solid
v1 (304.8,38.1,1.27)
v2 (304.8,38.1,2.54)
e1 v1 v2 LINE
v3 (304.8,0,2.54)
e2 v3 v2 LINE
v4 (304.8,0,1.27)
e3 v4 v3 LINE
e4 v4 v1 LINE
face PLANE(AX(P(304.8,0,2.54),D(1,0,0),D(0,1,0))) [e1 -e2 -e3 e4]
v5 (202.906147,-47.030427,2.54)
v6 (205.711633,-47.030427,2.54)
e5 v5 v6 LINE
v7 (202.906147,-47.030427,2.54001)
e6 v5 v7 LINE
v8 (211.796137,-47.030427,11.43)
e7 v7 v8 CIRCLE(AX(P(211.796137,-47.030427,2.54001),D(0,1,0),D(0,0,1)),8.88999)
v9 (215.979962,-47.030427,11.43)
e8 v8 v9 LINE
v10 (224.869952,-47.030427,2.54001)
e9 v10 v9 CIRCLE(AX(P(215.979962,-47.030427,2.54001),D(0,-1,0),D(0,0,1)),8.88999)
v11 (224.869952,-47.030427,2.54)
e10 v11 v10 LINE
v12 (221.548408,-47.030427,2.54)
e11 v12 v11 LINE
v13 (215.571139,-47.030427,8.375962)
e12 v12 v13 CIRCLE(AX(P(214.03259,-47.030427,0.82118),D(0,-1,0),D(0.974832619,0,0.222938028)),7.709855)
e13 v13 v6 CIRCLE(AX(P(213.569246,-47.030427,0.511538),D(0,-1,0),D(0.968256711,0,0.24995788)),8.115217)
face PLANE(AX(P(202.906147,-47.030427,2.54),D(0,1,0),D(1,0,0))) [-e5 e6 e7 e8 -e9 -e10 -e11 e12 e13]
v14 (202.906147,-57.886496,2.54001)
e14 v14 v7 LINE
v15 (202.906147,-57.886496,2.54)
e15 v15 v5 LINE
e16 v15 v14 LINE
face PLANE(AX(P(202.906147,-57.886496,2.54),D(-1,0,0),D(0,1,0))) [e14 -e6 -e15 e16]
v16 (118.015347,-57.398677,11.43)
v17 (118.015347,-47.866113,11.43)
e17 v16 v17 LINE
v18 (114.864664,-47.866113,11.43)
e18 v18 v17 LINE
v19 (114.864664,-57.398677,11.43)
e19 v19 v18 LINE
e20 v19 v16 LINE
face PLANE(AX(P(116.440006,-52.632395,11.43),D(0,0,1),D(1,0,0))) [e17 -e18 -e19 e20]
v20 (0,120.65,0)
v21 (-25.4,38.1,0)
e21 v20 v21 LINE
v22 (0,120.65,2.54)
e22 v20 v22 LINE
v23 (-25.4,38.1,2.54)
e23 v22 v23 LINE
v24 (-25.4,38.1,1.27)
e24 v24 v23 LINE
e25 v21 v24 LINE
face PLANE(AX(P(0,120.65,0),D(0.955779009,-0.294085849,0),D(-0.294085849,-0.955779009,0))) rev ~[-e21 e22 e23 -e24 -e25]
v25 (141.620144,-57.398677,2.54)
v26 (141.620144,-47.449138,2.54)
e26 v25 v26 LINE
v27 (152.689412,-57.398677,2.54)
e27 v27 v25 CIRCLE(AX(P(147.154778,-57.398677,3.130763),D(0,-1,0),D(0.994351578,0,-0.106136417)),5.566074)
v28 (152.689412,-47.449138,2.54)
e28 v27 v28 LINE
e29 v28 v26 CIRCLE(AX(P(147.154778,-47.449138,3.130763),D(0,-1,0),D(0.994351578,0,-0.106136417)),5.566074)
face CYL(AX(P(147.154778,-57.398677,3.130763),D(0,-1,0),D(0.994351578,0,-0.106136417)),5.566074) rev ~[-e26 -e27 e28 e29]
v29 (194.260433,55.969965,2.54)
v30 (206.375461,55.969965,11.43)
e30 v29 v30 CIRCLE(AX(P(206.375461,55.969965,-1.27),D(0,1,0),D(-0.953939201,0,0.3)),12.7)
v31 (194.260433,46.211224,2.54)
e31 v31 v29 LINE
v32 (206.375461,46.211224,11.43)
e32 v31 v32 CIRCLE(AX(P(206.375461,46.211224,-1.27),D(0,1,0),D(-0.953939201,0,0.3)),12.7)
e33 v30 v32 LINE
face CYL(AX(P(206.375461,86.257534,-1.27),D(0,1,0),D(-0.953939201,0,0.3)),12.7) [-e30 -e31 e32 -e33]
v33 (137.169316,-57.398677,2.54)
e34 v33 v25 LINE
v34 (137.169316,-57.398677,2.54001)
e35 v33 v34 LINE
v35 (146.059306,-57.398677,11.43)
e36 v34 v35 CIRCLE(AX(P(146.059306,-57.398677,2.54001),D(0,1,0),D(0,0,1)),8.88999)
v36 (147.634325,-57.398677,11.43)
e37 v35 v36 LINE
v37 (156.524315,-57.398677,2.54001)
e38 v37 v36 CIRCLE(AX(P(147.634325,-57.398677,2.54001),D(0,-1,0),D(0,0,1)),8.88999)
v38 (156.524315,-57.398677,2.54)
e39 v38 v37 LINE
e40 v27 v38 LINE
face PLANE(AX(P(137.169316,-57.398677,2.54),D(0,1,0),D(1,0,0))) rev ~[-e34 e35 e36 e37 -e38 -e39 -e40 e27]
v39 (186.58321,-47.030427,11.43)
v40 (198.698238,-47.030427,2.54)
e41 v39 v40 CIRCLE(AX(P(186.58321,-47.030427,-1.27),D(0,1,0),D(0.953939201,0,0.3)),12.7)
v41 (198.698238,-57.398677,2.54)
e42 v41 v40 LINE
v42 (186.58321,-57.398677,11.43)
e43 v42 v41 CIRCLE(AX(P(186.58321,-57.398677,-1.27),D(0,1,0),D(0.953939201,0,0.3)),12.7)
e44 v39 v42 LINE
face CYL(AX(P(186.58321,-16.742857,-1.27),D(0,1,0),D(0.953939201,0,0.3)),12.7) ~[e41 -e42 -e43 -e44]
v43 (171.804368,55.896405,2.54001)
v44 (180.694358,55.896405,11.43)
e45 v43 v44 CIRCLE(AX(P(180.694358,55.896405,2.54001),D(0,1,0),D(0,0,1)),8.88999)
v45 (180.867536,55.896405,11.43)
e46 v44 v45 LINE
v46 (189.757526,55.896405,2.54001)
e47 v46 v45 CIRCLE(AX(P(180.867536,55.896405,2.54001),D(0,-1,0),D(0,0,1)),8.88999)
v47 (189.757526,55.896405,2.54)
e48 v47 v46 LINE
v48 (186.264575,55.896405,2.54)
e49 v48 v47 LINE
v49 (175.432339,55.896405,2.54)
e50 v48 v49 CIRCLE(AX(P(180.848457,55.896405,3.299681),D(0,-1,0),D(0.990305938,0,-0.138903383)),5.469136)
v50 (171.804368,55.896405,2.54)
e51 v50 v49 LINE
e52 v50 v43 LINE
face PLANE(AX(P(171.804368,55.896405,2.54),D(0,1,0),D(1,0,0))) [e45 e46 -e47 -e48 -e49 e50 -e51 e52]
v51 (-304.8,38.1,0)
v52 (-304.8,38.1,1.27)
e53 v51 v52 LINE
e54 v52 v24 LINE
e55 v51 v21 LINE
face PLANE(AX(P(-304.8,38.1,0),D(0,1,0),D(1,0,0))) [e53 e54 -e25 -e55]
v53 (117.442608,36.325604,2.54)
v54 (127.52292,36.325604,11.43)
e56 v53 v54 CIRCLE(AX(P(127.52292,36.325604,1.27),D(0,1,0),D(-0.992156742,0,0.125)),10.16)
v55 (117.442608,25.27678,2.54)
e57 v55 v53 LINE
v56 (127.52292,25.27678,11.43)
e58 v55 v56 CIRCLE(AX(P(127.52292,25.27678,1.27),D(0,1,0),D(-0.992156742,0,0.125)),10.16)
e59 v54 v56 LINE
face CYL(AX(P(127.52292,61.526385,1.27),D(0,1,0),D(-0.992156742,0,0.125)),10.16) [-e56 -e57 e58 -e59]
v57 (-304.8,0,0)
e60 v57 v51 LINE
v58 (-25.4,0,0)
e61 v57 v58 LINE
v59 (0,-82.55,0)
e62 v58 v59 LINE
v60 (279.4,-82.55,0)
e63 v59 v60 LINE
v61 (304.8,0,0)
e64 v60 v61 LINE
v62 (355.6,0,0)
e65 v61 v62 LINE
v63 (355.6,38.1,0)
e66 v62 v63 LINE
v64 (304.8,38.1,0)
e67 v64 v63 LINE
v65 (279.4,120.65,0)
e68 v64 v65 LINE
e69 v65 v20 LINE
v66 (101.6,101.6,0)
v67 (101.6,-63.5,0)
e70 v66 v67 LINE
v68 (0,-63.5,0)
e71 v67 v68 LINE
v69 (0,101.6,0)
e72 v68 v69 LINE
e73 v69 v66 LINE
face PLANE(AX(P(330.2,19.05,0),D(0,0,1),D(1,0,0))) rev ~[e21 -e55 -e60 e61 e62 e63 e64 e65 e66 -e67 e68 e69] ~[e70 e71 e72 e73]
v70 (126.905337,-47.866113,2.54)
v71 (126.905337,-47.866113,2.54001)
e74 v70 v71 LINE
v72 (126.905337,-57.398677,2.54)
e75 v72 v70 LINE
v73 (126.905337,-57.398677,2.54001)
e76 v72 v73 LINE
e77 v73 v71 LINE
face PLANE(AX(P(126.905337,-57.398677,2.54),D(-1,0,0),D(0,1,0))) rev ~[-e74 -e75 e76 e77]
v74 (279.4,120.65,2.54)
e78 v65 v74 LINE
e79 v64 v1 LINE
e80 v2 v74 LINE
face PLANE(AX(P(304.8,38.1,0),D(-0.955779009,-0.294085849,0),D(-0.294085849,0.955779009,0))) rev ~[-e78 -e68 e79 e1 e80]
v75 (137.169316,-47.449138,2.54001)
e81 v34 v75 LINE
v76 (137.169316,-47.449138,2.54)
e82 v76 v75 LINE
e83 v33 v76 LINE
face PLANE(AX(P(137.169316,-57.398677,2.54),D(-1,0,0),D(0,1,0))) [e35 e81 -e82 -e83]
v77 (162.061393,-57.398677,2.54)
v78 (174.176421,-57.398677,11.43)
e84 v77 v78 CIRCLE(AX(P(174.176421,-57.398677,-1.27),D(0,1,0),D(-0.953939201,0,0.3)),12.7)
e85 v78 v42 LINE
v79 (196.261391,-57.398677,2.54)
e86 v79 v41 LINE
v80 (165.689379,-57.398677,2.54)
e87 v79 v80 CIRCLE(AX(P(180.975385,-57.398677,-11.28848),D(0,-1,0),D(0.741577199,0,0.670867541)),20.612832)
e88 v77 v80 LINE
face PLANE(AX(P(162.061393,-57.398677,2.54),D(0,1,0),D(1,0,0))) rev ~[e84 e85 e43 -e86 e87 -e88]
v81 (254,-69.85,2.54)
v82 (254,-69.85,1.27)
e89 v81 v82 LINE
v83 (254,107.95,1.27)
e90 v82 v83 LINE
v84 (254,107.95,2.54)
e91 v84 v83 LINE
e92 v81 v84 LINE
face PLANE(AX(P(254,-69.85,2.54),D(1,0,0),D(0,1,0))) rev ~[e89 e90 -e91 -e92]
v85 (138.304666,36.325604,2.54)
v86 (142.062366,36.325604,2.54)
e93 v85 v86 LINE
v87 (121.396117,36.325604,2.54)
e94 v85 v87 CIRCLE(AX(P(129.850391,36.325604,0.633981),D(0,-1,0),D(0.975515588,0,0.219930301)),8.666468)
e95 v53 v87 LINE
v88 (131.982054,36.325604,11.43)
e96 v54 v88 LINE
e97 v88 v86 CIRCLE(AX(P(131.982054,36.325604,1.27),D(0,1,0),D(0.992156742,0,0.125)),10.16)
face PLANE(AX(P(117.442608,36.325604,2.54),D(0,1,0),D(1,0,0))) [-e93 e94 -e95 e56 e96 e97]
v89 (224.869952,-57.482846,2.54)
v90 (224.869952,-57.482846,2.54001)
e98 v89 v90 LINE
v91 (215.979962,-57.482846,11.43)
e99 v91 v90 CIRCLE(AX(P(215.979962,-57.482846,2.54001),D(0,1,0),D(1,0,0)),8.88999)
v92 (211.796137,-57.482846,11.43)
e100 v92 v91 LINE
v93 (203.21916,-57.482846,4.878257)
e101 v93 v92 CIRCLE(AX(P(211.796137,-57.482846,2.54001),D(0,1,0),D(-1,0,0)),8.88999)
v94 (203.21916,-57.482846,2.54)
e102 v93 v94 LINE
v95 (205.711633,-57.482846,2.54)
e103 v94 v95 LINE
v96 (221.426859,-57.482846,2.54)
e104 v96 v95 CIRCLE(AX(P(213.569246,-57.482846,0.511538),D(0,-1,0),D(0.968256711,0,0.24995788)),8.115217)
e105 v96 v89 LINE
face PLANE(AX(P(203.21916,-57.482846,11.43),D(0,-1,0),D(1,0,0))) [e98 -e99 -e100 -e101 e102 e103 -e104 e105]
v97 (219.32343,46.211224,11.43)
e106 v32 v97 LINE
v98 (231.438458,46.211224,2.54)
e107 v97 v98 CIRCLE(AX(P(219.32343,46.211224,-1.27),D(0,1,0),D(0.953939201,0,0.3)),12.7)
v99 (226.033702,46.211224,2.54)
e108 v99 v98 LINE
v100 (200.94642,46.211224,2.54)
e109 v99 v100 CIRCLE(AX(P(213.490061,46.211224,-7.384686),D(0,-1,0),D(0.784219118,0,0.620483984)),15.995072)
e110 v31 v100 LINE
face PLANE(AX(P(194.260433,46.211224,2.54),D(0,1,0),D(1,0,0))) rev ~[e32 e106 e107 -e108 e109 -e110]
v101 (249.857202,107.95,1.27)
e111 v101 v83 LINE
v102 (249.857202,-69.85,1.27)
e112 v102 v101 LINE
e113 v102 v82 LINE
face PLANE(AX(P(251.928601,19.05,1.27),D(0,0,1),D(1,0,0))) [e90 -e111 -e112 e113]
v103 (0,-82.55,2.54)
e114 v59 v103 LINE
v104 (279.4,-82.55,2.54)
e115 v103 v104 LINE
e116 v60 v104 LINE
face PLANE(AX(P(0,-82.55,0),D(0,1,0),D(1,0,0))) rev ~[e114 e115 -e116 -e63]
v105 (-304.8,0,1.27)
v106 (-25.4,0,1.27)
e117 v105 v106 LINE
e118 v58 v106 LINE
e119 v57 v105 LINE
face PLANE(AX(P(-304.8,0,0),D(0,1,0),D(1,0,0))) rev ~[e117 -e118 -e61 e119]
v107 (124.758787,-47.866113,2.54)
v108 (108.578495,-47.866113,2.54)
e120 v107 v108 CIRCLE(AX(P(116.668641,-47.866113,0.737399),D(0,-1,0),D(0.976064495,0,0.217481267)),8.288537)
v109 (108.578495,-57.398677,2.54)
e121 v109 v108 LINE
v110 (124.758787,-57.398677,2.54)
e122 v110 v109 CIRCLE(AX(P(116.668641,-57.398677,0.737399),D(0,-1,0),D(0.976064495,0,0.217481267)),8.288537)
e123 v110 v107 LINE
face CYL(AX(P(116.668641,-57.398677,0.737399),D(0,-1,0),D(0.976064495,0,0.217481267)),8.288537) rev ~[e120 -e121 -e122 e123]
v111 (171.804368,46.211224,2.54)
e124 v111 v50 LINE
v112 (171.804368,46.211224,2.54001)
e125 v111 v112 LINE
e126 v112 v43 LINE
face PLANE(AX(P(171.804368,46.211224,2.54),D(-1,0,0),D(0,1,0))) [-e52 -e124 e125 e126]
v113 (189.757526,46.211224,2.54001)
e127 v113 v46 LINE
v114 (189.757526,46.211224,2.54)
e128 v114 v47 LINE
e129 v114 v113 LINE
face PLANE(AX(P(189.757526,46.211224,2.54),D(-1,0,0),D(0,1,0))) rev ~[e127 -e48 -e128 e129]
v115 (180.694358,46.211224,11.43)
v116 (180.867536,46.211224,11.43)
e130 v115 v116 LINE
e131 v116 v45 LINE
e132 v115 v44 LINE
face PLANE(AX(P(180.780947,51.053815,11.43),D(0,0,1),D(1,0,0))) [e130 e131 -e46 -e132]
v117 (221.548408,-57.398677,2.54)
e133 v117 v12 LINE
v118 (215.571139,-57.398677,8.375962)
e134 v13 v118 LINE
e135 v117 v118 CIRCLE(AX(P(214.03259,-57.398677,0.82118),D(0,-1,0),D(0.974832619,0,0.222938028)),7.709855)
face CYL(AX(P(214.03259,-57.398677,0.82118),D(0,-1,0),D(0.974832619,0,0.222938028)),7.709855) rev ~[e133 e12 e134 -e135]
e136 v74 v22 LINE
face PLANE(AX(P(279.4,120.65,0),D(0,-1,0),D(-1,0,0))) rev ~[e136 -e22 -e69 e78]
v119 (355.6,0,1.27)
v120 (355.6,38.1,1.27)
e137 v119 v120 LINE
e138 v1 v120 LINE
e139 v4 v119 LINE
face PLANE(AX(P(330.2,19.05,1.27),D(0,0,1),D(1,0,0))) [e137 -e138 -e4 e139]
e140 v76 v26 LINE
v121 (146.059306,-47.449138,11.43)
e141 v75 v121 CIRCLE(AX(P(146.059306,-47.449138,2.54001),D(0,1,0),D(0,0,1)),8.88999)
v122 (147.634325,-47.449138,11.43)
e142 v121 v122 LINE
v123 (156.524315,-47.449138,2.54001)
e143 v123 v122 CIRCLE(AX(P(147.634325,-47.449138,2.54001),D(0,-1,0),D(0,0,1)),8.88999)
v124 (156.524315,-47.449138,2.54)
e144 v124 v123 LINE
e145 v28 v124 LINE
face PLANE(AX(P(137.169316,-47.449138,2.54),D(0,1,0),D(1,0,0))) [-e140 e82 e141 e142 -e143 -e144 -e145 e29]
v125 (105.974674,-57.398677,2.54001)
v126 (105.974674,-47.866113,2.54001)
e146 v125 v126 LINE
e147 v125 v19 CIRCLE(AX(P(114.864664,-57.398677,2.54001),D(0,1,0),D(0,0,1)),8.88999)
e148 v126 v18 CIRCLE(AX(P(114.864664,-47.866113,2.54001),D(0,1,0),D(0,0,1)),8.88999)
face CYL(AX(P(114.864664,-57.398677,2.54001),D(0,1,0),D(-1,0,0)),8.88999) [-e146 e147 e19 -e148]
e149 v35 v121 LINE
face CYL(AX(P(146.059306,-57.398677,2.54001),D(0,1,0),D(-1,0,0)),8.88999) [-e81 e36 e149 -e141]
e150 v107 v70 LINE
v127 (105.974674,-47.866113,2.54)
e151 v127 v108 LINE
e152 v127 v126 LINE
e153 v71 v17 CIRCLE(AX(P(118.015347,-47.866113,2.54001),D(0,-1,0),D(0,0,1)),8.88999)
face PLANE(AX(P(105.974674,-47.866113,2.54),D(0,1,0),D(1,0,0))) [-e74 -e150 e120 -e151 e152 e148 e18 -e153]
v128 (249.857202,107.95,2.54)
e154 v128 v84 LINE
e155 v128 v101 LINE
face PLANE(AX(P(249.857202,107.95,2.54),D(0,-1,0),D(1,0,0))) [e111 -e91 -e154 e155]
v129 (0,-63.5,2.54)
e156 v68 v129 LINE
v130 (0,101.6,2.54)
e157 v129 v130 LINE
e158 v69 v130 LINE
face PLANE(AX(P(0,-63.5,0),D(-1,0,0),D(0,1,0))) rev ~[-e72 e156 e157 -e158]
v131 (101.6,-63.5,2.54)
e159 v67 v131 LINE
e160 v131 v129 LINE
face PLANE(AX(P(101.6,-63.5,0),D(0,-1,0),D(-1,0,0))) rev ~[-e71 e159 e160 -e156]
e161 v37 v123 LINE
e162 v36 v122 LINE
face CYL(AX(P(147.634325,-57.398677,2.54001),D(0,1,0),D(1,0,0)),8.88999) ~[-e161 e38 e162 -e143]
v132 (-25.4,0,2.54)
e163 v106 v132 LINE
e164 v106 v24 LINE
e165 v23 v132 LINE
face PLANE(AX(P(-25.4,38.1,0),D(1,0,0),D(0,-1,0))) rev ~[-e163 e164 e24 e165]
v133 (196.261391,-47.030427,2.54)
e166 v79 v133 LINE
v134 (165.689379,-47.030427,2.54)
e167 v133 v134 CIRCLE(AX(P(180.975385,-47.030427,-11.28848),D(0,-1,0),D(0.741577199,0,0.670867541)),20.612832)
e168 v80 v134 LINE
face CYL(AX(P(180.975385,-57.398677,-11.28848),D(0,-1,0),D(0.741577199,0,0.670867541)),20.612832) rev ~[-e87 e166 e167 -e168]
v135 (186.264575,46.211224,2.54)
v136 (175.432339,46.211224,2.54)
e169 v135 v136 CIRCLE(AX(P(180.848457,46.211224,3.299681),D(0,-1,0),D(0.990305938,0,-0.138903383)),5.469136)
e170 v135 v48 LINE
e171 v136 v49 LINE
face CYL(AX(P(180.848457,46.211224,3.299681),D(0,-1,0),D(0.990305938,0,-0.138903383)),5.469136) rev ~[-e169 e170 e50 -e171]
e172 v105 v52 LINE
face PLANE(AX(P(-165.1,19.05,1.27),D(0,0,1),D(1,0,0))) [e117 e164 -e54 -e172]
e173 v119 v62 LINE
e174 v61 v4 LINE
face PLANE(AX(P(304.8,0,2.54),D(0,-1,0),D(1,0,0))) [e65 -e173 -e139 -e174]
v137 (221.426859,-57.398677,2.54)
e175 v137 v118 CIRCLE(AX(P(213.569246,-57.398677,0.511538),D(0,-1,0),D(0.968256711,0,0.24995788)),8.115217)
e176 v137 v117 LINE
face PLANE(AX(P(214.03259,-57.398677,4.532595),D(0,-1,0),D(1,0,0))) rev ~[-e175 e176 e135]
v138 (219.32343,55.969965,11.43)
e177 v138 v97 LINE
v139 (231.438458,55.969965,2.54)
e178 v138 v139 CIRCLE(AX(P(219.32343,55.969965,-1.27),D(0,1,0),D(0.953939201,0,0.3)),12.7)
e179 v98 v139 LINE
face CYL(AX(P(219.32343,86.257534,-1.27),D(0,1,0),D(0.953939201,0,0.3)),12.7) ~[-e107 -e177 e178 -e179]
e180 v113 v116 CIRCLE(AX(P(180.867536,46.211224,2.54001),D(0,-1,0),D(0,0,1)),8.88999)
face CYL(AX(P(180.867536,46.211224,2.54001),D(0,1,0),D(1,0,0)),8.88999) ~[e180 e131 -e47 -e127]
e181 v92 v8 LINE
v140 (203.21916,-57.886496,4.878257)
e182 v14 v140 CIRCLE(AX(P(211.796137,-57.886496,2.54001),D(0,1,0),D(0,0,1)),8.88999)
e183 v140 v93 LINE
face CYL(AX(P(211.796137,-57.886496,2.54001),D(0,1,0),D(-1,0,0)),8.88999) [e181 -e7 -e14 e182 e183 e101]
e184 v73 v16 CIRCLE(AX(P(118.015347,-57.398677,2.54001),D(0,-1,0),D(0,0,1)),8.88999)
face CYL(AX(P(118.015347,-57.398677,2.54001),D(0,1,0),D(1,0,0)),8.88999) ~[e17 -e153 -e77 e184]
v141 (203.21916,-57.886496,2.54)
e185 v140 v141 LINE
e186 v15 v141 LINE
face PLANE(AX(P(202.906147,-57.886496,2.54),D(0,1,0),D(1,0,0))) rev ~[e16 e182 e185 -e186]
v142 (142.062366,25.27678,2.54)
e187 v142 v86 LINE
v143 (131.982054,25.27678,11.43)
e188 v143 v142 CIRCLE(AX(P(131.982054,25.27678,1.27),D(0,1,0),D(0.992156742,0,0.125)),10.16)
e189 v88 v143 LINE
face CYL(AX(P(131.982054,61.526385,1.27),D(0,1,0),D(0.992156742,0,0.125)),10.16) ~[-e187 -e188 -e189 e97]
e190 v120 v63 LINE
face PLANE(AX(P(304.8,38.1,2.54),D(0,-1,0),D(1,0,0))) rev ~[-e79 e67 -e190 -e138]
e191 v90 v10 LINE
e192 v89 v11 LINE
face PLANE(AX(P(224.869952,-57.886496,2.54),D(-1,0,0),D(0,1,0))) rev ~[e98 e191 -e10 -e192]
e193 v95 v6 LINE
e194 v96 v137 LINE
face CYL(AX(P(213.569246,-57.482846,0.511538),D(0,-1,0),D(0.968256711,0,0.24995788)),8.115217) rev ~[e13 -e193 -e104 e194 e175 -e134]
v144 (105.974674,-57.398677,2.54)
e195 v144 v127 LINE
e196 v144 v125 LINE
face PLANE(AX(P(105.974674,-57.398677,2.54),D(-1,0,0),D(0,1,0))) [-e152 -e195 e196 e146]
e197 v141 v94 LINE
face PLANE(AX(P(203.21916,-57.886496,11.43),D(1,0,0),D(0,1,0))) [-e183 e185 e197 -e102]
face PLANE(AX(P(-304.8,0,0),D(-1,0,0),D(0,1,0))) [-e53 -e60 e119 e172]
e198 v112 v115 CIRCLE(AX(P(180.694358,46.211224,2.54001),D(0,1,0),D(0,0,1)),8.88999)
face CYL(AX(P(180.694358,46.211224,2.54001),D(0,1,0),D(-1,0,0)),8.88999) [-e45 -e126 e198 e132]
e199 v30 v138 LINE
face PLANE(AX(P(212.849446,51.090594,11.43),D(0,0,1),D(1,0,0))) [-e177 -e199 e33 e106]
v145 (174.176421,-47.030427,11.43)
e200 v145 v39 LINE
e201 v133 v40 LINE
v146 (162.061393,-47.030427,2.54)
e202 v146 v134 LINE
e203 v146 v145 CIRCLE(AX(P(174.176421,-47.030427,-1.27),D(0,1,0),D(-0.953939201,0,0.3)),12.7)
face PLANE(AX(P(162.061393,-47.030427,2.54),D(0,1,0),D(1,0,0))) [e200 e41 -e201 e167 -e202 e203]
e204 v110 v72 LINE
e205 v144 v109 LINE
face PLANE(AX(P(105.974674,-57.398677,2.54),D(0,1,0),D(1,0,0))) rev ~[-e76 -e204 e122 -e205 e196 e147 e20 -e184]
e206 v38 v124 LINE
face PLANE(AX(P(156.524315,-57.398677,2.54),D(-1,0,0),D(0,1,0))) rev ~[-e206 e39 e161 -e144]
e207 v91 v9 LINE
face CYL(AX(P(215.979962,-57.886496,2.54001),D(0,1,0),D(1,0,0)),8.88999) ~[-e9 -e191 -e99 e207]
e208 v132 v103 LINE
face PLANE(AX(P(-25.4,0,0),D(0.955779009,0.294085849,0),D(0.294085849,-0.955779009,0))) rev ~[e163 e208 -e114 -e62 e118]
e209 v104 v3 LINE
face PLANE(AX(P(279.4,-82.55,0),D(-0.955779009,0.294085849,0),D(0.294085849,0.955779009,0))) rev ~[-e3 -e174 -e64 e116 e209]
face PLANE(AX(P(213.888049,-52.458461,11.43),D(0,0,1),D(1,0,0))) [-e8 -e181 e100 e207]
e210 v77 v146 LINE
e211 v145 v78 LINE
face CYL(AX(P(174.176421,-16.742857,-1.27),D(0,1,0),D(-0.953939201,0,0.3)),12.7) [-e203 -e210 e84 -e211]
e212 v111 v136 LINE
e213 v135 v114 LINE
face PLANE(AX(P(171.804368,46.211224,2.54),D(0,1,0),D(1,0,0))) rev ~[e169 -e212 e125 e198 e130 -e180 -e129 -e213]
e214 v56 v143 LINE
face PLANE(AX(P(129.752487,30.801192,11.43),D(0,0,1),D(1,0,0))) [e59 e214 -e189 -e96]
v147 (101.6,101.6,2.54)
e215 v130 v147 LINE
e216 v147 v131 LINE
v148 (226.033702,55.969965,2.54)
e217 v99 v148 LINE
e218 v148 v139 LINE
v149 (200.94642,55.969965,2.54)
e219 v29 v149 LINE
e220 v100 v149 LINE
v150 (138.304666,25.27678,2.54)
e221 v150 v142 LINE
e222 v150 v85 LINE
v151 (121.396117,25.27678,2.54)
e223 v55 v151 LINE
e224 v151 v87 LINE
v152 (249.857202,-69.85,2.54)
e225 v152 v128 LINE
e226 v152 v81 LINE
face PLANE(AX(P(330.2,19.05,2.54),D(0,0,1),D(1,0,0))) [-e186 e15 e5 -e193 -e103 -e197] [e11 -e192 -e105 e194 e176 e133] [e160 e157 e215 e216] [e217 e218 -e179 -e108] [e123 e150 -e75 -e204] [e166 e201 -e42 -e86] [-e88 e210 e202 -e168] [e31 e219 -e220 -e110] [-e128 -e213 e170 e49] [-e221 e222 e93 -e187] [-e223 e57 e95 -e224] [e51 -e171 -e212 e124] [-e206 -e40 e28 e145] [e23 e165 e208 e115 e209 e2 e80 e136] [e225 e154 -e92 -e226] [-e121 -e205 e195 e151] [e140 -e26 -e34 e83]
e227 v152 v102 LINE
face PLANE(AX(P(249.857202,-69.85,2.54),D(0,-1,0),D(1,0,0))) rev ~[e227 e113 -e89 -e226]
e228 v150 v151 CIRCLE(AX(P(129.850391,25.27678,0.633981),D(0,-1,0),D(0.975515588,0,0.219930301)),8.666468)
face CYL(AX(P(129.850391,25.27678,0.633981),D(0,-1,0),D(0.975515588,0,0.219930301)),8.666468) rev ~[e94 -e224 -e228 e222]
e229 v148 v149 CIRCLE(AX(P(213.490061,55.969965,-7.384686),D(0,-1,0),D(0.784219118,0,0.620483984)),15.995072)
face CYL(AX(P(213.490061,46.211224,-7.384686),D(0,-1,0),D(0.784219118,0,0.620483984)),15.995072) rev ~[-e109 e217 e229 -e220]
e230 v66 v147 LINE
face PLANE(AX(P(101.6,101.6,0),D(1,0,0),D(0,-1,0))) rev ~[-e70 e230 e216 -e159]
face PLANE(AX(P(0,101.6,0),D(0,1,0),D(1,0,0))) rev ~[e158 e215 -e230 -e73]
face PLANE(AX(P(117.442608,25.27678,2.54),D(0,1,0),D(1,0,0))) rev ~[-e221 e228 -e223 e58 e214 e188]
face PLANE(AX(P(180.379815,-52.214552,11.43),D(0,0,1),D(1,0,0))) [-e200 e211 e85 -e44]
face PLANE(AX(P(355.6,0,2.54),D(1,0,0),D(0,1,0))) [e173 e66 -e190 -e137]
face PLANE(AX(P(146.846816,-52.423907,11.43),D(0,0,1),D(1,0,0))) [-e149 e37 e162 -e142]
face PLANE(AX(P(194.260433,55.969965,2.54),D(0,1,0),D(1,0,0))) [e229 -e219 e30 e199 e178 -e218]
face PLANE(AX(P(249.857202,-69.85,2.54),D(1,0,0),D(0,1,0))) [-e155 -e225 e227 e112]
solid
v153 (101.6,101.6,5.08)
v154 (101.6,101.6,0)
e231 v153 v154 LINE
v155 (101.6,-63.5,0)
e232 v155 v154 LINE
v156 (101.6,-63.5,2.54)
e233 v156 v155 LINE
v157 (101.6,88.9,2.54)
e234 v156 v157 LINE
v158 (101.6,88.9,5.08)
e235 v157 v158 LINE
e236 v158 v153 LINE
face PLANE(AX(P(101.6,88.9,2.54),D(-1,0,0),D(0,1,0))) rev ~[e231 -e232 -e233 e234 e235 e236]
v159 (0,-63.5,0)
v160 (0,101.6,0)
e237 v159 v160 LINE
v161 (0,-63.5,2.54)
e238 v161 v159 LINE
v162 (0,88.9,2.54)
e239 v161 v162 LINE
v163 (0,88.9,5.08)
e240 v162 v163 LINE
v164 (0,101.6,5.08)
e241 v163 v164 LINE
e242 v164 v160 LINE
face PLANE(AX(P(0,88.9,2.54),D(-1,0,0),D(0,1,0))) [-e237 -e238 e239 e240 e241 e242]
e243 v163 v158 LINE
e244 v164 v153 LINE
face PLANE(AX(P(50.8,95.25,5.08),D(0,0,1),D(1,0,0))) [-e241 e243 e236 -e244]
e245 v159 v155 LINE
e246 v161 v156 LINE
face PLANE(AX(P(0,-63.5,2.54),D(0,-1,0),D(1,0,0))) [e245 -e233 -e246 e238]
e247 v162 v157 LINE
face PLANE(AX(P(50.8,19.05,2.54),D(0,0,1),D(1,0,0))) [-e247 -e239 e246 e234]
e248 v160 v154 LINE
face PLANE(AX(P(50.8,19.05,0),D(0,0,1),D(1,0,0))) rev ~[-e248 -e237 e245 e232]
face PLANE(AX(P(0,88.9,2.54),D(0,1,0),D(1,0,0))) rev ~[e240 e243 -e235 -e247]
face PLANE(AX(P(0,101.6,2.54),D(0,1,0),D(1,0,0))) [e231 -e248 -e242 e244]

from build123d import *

# Parameters (mm, degrees)
F0_W         = 279.4
F0_H         = 38.1
F1_DEPTH     = 1.27
F3_DEPTH     = 2.54
F4_W         = 101.6
F4_H         = 165.1
F5_DEPTH     = 2.54
F6_W         = 101.6
F6_H         = 12.7
F7_DEPTH     = 2.54
F8_W         = 50.8
F8_H         = 38.1
F9_DEPTH     = 2.54
F10_W        = 50.8
F10_H        = 38.1
F11_DEPTH    = 1.27
F12_W        = 4.1427978277
F12_H        = 177.8
F13_DEPTH    = 1.27
F15_W        = 20.9306627512
F15_H        = 9.5325633883
F15_W_2      = 19.3549990654
F15_H_2      = 9.9495388567
F15_W_3      = 24.6197581291
F15_H_3      = 11.048823595
F15_W_4      = 36.6368442774
F15_H_4      = 10.3682503104
F15_W_5      = 17.9531574249
F15_H_5      = 9.6851810813
F15_W_6      = 37.1780246496
F15_H_6      = 9.7587406635
F15_W_7      = 21.9638049603
F15_H_7      = 10.8560696244
F16_DEPTH    = 8.89
F17_R        = 8.88999
F18_T1_DEPTH = 61.4503860708
F19_T1_DEPTH = 70.9433896004
F19_T3_DEPTH = 70.3338799535
F21_DEPTH    = 25.4
F23_DEPTH    = 25.4
F25_DEPTH    = 25.4
F26_W        = 21.9202637672
F26_H        = 0.403650105
F27_DEPTH    = 8.89
F29_DEPTH    = 25.4


# Not quite as in the source:
# - a fillet or chamfer that OpenCascade refuses, or shapes differently, is made with other operations: its cross-section is extruded or revolved along the edge and cut away or added
# - a fillet or chamfer is up to 0.001 mm smaller than in the source, because OpenCascade refuses the exact size


with BuildPart() as f1:
    # F0 (on Top) → F1 (new body)
    with BuildSketch(Plane.XY):
        with Locations((-165.1, 19.05)):
            Rectangle(F0_W, F0_H)
    extrude(amount=F1_DEPTH)

    # F2 (on Top) → F3 (join)
    with BuildSketch(Plane.XY):
        Polygon((0, -63.5), (0, 0), (0, 38.1), (0, 101.6), (0, 120.65), (-25.4, 38.1), (-25.4, 0), (0, -82.55), align=None)
        Polygon((101.6, -63.5), (0, -63.5), (0, -82.55), (279.4, -82.55), (279.4, 120.65), (0, 120.65), (0, 101.6), (101.6, 101.6), align=None)
        Polygon((279.4, 120.65), (279.4, -82.55), (304.8, 0), (304.8, 38.1), align=None)
    extrude(amount=F3_DEPTH)

    # F8 (on face) → F9 (join)
    with BuildSketch(Plane.XY.offset(2.54)):
        with Locations((330.2, 19.05)):
            Rectangle(F8_W, F8_H)
    extrude(amount=-F9_DEPTH)

    # F10 (on face) → F11 (cut)
    with BuildSketch(Plane.XY.offset(2.54)):
        with Locations((330.2, 19.05)):
            Rectangle(F10_W, F10_H)
    extrude(amount=-F11_DEPTH, mode=Mode.SUBTRACT)

    # F12 (on face) → F13 (cut)
    with BuildSketch(Plane.XY.offset(2.54)):
        with Locations((251.9286010861, 19.05)):
            Rectangle(F12_W, F12_H)
    extrude(amount=-F13_DEPTH, mode=Mode.SUBTRACT)

    # F15 (on face) → F16 (join)
    with BuildSketch(Plane.XY.offset(2.54)):
        with Locations((116.4400056005, -52.6323951781)):
            Rectangle(F15_W, F15_H)
        with Locations((146.8468159437, -52.4239074439)):
            Rectangle(F15_W_2, F15_H_2)
        with Locations((129.7524869442, 30.801191926)):
            Rectangle(F15_W_3, F15_H_3)
        with Locations((180.3798153996, -52.214551717)):
            Rectangle(F15_W_4, F15_H_4)
        with Locations((180.7809472084, 51.05381459)):
            Rectangle(F15_W_5, F15_H_5)
        with Locations((212.849445641, 51.0905943811)):
            Rectangle(F15_W_6, F15_H_6)
        with Locations((213.8880491257, -52.458461374)):
            Rectangle(F15_W_7, F15_H_7)
    extrude(amount=F16_DEPTH)

    # F17 (radius 8.89 in the source; OpenCascade refuses exactly that, so slightly less here)
    f17_edges = [f1.edges().sort_by_distance(p)[0] for p in [
        (105.974674, -52.632395, 11.43),
        (126.905337, -52.632395, 11.43),
        (137.169316, -52.423907, 11.43),
        (156.524315, -52.423907, 11.43),
        (202.906147, -52.458461, 11.43),
        (224.869952, -52.458461, 11.43),
        (189.757526, 51.053815, 11.43),
        (171.804368, 51.053815, 11.43),
    ]]
    fillet(f17_edges, radius=F17_R)

    # F18: fillet of radius 10.16 on 2 edges, made by hand

    # F18_s2 → F18_t1 (cut)
    with BuildSketch(Plane.XZ.offset(-61.5263849614)):
        with BuildLine():
            ThreePointArc((117.4426078796, 2.54), (120.8027120447, 8.89), (127.5229203748, 11.43))
            Line((127.5229203748, 11.43), (117.4426078796, 11.43))
            Line((117.4426078796, 11.43), (117.4426078796, 2.54))
        make_face()
        with BuildLine():
            ThreePointArc((142.0623660088, 2.54), (138.7022618437, 8.89), (131.9820535136, 11.43))
            Line((131.9820535136, 11.43), (142.0623660088, 11.43))
            Line((142.0623660088, 11.43), (142.0623660088, 2.54))
        make_face()
    extrude(amount=F18_T1_DEPTH, mode=Mode.SUBTRACT)

    # F19: fillet of radius 12.7 on 4 edges, made by hand

    # F19_s2 → F19_t1 (cut)
    with BuildSketch(Plane.XZ.offset(16.7428569168)):
        with BuildLine():
            ThreePointArc((162.061393261, 2.54), (166.6629997944, 8.9690673403), (174.176421119, 11.43))
            Line((174.176421119, 11.43), (162.061393261, 11.43))
            Line((162.061393261, 11.43), (162.061393261, 2.54))
        make_face()
        with BuildLine():
            ThreePointArc((198.6982375383, 2.54), (194.0966310049, 8.9690673403), (186.5832096803, 11.43))
            Line((186.5832096803, 11.43), (198.6982375383, 11.43))
            Line((198.6982375383, 11.43), (198.6982375383, 2.54))
        make_face()
    extrude(amount=F19_T1_DEPTH, mode=Mode.SUBTRACT)

    # F19_s4 → F19_t3 (cut)
    with BuildSketch(Plane.XZ.offset(-86.2575343578)):
        with BuildLine():
            ThreePointArc((194.2604333162, 2.54), (198.8620398497, 8.9690673403), (206.3754611742, 11.43))
            Line((206.3754611742, 11.43), (194.2604333162, 11.43))
            Line((194.2604333162, 11.43), (194.2604333162, 2.54))
        make_face()
        with BuildLine():
            ThreePointArc((231.4384579659, 2.54), (226.8368514324, 8.9690673403), (219.3234301079, 11.43))
            Line((219.3234301079, 11.43), (231.4384579659, 11.43))
            Line((231.4384579659, 11.43), (231.4384579659, 2.54))
        make_face()
    extrude(amount=F19_T3_DEPTH, mode=Mode.SUBTRACT)

    # F20 (on face) → F21 (cut)
    with BuildSketch(Plane.XZ.offset(-25.2767801285)):
        with BuildLine():
            Line((121.3961169124, 2.54), (138.3046656847, 2.54))
            ThreePointArc((138.3046656847, 2.54), (129.8503912985, 9.3004488884), (121.3961169124, 2.54))
        make_face()
    extrude(amount=-F21_DEPTH, mode=Mode.SUBTRACT)

    # F22 (on face) → F23 (cut)
    with BuildSketch(Plane.XZ.offset(-46.2112240493)):
        with BuildLine():
            Line((175.4323393106, 2.54), (186.2645745277, 2.54))
            ThreePointArc((186.2645745277, 2.54), (180.8484569192, 8.7688172062), (175.4323393106, 2.54))
        make_face()
        with BuildLine():
            Line((200.9464204311, 2.54), (226.0337024927, 2.54))
            ThreePointArc((226.0337024927, 2.54), (213.4900614619, 8.6103858863), (200.9464204311, 2.54))
        make_face()
    extrude(amount=-F23_DEPTH, mode=Mode.SUBTRACT)

    # F24 (on face) → F25 (cut)
    with BuildSketch(Plane.XZ.offset(57.3986768723)):
        with BuildLine():
            Line((108.5784949401, 2.54), (124.7587874532, 2.54))
            ThreePointArc((124.7587874532, 2.54), (116.6686411966, 9.025935128), (108.5784949401, 2.54))
        make_face()
        with BuildLine():
            Line((141.620144248, 2.54), (152.6894122362, 2.54))
            ThreePointArc((152.6894122362, 2.54), (147.1547782421, 8.6968366243), (141.620144248, 2.54))
        make_face()
        with BuildLine():
            Line((165.6893789768, 2.54), (196.2613910437, 2.54))
            ThreePointArc((196.2613910437, 2.54), (180.9753850102, 9.3243519976), (165.6893789768, 2.54))
        make_face()
        with BuildLine():
            Line((206.5167725086, 2.54), (221.5484082699, 2.54))
            ThreePointArc((221.5484082699, 2.54), (214.0325903893, 8.531034918), (206.5167725086, 2.54))
        make_face()
    extrude(amount=-F25_DEPTH, mode=Mode.SUBTRACT)

    # F26 (on face) → F27 (cut)
    with BuildSketch(Plane.XY.offset(11.43)):
        with Locations((214.1792923212, -57.6846711338)):
            Rectangle(F26_W, F26_H)
    extrude(amount=-F27_DEPTH, mode=Mode.SUBTRACT)

    # F28 (on face) → F29 (cut)
    with BuildSketch(Plane.XZ.offset(57.4828460813)):
        with BuildLine():
            Line((205.711632967, 2.54), (221.426859498, 2.54))
            ThreePointArc((221.426859498, 2.54), (213.5692462325, 8.6267545228), (205.711632967, 2.54))
        make_face()
    extrude(amount=-F29_DEPTH, mode=Mode.SUBTRACT)


with BuildPart() as f5:
    # F4 (on face) → F5 (new body)
    with BuildSketch(Plane.XY.offset(2.54)):
        with Locations((50.8, 19.05)):
            Rectangle(F4_W, F4_H)
    extrude(amount=-F5_DEPTH)

    # F6 (on face) → F7 (join)
    with BuildSketch(Plane.XY.offset(2.54)):
        with Locations((50.8, 95.25)):
            Rectangle(F6_W, F6_H)
    extrude(amount=F7_DEPTH)


solid = Compound([f1.part, f5.part])
